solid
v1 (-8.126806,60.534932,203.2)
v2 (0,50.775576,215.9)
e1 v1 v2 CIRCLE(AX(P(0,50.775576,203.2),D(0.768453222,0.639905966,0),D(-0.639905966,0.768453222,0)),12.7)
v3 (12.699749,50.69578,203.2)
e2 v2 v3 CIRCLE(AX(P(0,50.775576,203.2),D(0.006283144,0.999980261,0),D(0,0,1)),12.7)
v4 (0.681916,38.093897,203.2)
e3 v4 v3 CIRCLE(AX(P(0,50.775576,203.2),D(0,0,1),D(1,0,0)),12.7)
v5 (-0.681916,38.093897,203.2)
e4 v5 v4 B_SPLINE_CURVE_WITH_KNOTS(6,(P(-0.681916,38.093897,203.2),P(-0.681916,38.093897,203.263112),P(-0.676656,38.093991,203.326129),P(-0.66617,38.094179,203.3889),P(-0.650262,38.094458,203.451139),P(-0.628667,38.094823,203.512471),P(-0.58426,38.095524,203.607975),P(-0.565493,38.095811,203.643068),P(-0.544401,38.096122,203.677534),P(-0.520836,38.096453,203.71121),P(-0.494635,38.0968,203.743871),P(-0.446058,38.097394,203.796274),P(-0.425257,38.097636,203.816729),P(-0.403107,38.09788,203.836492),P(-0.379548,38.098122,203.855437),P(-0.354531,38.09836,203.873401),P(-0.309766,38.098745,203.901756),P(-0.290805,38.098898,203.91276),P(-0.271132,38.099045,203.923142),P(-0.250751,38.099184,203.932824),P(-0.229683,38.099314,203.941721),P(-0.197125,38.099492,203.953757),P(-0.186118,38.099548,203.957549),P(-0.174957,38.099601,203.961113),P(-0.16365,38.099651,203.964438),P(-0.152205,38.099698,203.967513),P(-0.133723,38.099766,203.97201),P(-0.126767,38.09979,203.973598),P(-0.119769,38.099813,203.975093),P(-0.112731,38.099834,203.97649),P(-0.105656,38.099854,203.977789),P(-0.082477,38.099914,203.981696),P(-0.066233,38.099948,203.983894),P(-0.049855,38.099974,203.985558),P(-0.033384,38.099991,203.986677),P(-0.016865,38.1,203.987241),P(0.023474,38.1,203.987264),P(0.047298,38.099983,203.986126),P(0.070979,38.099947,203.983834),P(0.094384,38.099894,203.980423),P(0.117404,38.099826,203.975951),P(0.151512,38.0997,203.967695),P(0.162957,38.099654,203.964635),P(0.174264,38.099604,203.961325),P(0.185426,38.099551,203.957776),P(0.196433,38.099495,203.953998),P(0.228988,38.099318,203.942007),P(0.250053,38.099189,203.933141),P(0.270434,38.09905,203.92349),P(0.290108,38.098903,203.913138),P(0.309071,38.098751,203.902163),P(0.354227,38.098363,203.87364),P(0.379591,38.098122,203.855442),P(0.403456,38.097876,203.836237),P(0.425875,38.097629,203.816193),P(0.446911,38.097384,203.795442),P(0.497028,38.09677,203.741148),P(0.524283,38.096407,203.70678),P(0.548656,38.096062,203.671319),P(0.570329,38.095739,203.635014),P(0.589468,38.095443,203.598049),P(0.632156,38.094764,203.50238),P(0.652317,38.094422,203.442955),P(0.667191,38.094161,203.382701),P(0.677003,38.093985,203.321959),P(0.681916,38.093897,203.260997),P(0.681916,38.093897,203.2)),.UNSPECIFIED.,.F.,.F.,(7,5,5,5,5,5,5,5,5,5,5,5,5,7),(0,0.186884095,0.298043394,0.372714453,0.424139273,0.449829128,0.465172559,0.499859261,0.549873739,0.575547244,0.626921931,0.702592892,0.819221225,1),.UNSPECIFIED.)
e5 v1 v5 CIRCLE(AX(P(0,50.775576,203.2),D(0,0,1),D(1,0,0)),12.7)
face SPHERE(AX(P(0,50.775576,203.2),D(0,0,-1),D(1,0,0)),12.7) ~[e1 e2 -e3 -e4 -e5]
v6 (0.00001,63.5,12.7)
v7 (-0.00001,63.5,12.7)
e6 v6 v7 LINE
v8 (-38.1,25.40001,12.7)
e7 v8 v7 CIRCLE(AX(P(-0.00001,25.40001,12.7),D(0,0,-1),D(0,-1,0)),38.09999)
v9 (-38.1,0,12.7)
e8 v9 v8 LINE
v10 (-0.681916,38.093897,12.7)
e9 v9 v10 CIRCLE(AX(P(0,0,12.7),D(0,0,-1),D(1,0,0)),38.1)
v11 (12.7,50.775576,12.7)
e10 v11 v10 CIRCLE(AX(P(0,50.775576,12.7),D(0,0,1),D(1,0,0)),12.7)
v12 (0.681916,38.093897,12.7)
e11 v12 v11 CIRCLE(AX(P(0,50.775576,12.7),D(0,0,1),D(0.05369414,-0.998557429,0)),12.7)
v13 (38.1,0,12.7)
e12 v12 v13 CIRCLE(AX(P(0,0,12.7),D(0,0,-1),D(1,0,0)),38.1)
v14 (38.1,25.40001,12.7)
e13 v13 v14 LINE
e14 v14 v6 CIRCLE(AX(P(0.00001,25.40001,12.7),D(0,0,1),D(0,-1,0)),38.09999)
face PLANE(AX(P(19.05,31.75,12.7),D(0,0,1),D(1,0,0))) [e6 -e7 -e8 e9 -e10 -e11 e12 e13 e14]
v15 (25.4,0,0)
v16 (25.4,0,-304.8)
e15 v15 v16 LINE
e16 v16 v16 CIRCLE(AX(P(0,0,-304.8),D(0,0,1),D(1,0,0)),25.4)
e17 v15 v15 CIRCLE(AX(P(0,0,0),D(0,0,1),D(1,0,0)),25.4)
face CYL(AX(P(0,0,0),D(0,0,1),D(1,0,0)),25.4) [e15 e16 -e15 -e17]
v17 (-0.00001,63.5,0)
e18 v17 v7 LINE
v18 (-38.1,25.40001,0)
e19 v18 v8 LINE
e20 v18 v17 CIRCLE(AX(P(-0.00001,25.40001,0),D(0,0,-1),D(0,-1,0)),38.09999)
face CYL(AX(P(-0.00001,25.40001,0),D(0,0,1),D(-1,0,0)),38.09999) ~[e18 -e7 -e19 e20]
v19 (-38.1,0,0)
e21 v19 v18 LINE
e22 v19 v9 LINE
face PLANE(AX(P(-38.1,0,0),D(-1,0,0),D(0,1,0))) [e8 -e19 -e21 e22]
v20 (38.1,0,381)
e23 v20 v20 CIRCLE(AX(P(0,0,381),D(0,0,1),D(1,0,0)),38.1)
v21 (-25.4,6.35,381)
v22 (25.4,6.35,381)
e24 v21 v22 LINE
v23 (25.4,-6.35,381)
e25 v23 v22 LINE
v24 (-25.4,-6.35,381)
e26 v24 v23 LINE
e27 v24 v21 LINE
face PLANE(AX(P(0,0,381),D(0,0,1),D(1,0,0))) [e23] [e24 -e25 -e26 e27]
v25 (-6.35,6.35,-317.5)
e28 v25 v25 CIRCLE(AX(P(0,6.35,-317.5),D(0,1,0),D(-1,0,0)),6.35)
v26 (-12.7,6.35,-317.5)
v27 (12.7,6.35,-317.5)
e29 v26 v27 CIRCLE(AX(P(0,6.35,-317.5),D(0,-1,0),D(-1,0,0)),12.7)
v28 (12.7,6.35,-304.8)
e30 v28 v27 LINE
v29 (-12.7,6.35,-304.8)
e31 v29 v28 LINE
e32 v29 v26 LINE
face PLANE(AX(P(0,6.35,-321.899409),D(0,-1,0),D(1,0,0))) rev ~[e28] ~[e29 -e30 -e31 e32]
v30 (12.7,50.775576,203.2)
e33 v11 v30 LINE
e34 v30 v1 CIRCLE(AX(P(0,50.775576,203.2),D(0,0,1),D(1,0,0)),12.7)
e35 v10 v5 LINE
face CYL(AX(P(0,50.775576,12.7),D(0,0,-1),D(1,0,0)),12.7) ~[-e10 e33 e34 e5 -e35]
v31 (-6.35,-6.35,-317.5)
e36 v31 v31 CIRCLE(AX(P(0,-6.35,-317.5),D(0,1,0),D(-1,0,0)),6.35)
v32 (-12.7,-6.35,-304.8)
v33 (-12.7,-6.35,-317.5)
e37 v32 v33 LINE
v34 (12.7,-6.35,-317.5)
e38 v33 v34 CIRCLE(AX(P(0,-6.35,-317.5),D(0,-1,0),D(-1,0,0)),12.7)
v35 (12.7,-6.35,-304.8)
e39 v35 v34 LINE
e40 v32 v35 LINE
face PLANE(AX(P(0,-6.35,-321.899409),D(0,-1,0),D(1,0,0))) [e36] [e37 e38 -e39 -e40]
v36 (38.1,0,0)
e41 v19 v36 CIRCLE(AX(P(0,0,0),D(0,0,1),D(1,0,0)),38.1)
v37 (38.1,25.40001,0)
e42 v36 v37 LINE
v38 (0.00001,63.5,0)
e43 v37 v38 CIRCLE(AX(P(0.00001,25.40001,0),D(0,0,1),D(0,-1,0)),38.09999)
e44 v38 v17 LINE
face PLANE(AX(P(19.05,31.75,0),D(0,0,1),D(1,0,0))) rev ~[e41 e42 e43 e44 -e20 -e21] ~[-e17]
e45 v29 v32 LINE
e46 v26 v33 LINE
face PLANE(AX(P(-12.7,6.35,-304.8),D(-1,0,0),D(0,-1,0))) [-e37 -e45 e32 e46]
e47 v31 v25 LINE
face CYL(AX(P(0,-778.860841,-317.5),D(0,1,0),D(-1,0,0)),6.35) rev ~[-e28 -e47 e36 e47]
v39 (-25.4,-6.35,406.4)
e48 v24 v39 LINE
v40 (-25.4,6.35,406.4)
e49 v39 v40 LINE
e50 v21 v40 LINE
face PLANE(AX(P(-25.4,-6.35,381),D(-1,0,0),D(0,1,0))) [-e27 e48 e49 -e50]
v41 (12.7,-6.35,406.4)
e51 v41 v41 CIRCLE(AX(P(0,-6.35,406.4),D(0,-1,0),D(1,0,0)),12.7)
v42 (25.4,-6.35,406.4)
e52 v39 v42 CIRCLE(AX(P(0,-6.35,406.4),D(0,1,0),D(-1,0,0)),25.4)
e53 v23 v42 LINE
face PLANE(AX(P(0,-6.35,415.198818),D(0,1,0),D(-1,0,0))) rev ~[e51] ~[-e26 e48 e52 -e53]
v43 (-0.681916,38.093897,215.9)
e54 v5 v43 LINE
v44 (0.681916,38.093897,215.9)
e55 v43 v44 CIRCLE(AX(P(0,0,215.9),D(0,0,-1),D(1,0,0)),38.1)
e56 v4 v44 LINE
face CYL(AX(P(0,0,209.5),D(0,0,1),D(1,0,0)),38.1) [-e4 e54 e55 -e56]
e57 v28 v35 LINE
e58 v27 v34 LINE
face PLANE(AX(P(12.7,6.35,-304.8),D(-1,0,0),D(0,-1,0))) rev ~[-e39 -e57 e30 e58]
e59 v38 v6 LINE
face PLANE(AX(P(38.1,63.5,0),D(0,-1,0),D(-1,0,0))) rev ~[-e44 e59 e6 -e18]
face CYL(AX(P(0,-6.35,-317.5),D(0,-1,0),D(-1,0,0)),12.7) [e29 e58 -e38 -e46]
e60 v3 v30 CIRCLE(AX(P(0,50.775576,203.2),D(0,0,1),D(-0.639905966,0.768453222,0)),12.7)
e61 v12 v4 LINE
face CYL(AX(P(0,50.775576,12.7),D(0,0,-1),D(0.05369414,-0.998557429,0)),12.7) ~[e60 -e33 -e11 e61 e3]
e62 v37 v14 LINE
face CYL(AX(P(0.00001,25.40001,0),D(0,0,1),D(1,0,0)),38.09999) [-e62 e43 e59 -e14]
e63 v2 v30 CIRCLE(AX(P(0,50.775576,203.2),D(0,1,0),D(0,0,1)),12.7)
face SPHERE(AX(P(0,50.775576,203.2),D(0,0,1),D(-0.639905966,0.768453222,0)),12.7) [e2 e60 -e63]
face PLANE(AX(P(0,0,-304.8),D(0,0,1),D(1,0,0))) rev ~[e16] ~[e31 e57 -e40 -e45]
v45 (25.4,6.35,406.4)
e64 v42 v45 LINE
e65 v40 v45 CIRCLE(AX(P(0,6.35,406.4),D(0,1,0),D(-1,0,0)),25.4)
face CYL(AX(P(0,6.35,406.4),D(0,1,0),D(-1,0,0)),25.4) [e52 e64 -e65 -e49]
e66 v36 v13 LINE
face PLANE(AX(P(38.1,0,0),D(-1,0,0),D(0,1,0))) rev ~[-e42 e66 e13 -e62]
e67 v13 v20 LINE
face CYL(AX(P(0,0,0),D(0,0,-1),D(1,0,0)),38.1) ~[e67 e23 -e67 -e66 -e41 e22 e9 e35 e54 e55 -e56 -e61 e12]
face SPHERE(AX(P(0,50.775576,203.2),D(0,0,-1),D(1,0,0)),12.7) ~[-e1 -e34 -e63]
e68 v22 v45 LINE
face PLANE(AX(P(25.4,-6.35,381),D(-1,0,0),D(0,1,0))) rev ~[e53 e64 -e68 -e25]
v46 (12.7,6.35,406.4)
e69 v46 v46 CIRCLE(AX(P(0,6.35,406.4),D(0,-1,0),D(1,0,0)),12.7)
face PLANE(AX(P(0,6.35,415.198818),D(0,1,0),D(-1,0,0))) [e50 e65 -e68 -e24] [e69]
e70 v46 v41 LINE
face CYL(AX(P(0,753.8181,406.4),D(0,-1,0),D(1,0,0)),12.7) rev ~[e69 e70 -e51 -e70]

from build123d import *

# Parameters (mm, degrees)
F0_R         = 38.1
F1_DEPTH     = 381
F2_R         = 25.4
F3_DEPTH     = 304.8
F4_W         = 38.1
F4_H         = 63.5
F5_DEPTH     = 12.7
F7_DEPTH     = 203.2
F8_R         = 38.09999
F9_T3_ANGLE  = 359.64
F9_S4_R      = 38.1
F9_T5_DEPTH  = 21
F9_T8_ANGLE  = 230.2151920397
F9_S9_R      = 38.1
F9_T10_DEPTH = 20
F10_W        = 50.8
F10_H        = 12.7
F11_DEPTH    = 25.4
F13_DEPTH    = 12.7
F15_D        = 25.4
F16_W        = 25.4
F16_H        = 12.7
F17_DEPTH    = 12.7
F19_DEPTH    = 12.7
F21_D        = 12.7


# Not quite as in the source:
# - a fillet or chamfer that OpenCascade refuses, or shapes differently, is made with other operations: its cross-section is extruded or revolved along the edge and cut away or added
# - a fillet or chamfer is up to 0.001 mm smaller than in the source, because OpenCascade refuses the exact size


with BuildPart() as f1:
    # F0 (on Top) → F1 (new body)
    with BuildSketch(Plane.XY):
        Circle(F0_R)
    extrude(amount=F1_DEPTH)

    # F2 (on Top) → F3 (join)
    with BuildSketch(Plane.XY):
        Circle(F2_R)
    extrude(amount=-F3_DEPTH)

    # F4 (on Top) → F5 (join)
    with BuildSketch(Plane.XY):
        with Locations((19.05, 31.75)):
            Rectangle(F4_W, F4_H)
        with Locations((-19.05, 31.75)):
            Rectangle(F4_W, F4_H)
    extrude(amount=F5_DEPTH)

    # F6 (on face) → F7 (join)
    with BuildSketch(Plane.XY.offset(12.7)):
        with BuildLine():
            ThreePointArc((0.6819155813, 38.0938970327), (9.2181974345, 42.0397400715), (12.7, 50.7755763829))
            ThreePointArc((12.7, 50.7755763829), (-8.7358363114, 59.9937738174), (-0.6819155813, 38.0938970327))
            ThreePointArc((-0.6819155813, 38.0938970327), (0, 38.1), (0.6819155813, 38.0938970327))
        make_face()
        with BuildLine():
            ThreePointArc((0.6819155813, 38.0938970327), (0, 38.1), (-0.6819155813, 38.0938970327))
            ThreePointArc((-0.6819155813, 38.0938970327), (0, 38.0755763829), (0.6819155813, 38.0938970327))
        make_face()
    extrude(amount=F7_DEPTH)

    # F8 (radius 38.1 in the source; OpenCascade refuses exactly that, so slightly less here)
    f8_edges = [f1.edges().sort_by_distance(p)[0] for p in [
        (-38.1, 63.5, 6.35),
        (38.1, 63.5, 6.35),
    ]]
    fillet(f8_edges, radius=F8_R)

    # F9: fillet of radius 12.7 on 2 edges, made by hand


with BuildPart() as f9_tool1:
    # F9_s2 → F9_t3 (revolve)
    with BuildSketch(Plane.XZ.offset(-50.7755763829)):
        with BuildLine():
            ThreePointArc((0, 215.9), (8.9802561211, 212.1802561211), (12.7, 203.2))
            Line((12.7, 203.2), (12.7, 215.9))
            Line((12.7, 215.9), (0, 215.9))
        make_face()
    revolve(axis=Axis((0, 50.7755763829, 215.9), (0, 0, 1)), revolution_arc=F9_T3_ANGLE)

    # F9_s4 → F9_t5 (cut, symmetric)
    with BuildSketch(Plane.XY.offset(209.5)):
        Circle(F9_S4_R)
    extrude(amount=F9_T5_DEPTH, both=True, mode=Mode.SUBTRACT)


with BuildPart() as f9_tool6:
    # F9_s7 → F9_t8 (revolve)
    with BuildSketch(Plane(origin=(24.9682702957, 20.7915649924, 0), x_dir=(0, 0, 1), z_dir=(0.7684532224, 0.6399059658, 0))):
        with BuildLine():
            ThreePointArc((203.2, -51.7186552898), (212.1802561211, -47.9989114109), (215.9, -39.0186552898))
            Line((215.9, -39.0186552898), (215.9, -51.7186552898))
            Line((215.9, -51.7186552898), (203.2, -51.7186552898))
        make_face()
    revolve(axis=Axis((0, 50.7755763829, 215.9), (0, 0, 1)), revolution_arc=F9_T8_ANGLE)

    # F9_s9 → F9_t10 (cut, symmetric)
    with BuildSketch(Plane.XY.offset(209.5)):
        Circle(F9_S9_R)
    extrude(amount=F9_T10_DEPTH, both=True, mode=Mode.SUBTRACT)


with BuildPart() as f1_1:
    add(f1.part)

    # F9_t11: cut F9_tool1, F9_tool6
    add([f9_tool1.part, f9_tool6.part], mode=Mode.SUBTRACT)

    # F10 (on face) → F11 (join)
    with BuildSketch(Plane.XY.offset(381)):
        Rectangle(F10_W, F10_H)
    extrude(amount=F11_DEPTH)

    # F12 (on face) → F13 (join)
    with BuildSketch(Plane(origin=(0, 6.35, 0), x_dir=(-1, 0, 0), z_dir=(0, 1, 0))):
        with BuildLine():
            Line((-25.4, 406.4), (25.4, 406.4))
            ThreePointArc((25.4, 406.4), (0, 431.8), (-25.4, 406.4))
        make_face()
    extrude(amount=-F13_DEPTH)

    # F15 (through all)
    with Locations(Plane(origin=(0, 6.35, 0), x_dir=(-1, 0, 0), z_dir=(0, 1, 0))):
        with Locations((0, 406.4)):
            Hole(F15_D / 2)

    # F16 (on face) → F17 (join)
    with BuildSketch(Plane(origin=(0, 0, -304.8), x_dir=(1, 0, 0), z_dir=(0, 0, -1))):
        Rectangle(F16_W, F16_H)
    extrude(amount=F17_DEPTH)

    # F18 (on face) → F19 (join)
    with BuildSketch(Plane.XZ.offset(6.35)):
        with BuildLine():
            Line((12.7, -317.5), (-12.7, -317.5))
            ThreePointArc((-12.7, -317.5), (0, -330.2), (12.7, -317.5))
        make_face()
    extrude(amount=-F19_DEPTH)

    # F21 (through all)
    with Locations(Plane.XZ.offset(6.35)):
        with Locations((0, -317.5)):
            Hole(F21_D / 2)


solid = f1_1.part
